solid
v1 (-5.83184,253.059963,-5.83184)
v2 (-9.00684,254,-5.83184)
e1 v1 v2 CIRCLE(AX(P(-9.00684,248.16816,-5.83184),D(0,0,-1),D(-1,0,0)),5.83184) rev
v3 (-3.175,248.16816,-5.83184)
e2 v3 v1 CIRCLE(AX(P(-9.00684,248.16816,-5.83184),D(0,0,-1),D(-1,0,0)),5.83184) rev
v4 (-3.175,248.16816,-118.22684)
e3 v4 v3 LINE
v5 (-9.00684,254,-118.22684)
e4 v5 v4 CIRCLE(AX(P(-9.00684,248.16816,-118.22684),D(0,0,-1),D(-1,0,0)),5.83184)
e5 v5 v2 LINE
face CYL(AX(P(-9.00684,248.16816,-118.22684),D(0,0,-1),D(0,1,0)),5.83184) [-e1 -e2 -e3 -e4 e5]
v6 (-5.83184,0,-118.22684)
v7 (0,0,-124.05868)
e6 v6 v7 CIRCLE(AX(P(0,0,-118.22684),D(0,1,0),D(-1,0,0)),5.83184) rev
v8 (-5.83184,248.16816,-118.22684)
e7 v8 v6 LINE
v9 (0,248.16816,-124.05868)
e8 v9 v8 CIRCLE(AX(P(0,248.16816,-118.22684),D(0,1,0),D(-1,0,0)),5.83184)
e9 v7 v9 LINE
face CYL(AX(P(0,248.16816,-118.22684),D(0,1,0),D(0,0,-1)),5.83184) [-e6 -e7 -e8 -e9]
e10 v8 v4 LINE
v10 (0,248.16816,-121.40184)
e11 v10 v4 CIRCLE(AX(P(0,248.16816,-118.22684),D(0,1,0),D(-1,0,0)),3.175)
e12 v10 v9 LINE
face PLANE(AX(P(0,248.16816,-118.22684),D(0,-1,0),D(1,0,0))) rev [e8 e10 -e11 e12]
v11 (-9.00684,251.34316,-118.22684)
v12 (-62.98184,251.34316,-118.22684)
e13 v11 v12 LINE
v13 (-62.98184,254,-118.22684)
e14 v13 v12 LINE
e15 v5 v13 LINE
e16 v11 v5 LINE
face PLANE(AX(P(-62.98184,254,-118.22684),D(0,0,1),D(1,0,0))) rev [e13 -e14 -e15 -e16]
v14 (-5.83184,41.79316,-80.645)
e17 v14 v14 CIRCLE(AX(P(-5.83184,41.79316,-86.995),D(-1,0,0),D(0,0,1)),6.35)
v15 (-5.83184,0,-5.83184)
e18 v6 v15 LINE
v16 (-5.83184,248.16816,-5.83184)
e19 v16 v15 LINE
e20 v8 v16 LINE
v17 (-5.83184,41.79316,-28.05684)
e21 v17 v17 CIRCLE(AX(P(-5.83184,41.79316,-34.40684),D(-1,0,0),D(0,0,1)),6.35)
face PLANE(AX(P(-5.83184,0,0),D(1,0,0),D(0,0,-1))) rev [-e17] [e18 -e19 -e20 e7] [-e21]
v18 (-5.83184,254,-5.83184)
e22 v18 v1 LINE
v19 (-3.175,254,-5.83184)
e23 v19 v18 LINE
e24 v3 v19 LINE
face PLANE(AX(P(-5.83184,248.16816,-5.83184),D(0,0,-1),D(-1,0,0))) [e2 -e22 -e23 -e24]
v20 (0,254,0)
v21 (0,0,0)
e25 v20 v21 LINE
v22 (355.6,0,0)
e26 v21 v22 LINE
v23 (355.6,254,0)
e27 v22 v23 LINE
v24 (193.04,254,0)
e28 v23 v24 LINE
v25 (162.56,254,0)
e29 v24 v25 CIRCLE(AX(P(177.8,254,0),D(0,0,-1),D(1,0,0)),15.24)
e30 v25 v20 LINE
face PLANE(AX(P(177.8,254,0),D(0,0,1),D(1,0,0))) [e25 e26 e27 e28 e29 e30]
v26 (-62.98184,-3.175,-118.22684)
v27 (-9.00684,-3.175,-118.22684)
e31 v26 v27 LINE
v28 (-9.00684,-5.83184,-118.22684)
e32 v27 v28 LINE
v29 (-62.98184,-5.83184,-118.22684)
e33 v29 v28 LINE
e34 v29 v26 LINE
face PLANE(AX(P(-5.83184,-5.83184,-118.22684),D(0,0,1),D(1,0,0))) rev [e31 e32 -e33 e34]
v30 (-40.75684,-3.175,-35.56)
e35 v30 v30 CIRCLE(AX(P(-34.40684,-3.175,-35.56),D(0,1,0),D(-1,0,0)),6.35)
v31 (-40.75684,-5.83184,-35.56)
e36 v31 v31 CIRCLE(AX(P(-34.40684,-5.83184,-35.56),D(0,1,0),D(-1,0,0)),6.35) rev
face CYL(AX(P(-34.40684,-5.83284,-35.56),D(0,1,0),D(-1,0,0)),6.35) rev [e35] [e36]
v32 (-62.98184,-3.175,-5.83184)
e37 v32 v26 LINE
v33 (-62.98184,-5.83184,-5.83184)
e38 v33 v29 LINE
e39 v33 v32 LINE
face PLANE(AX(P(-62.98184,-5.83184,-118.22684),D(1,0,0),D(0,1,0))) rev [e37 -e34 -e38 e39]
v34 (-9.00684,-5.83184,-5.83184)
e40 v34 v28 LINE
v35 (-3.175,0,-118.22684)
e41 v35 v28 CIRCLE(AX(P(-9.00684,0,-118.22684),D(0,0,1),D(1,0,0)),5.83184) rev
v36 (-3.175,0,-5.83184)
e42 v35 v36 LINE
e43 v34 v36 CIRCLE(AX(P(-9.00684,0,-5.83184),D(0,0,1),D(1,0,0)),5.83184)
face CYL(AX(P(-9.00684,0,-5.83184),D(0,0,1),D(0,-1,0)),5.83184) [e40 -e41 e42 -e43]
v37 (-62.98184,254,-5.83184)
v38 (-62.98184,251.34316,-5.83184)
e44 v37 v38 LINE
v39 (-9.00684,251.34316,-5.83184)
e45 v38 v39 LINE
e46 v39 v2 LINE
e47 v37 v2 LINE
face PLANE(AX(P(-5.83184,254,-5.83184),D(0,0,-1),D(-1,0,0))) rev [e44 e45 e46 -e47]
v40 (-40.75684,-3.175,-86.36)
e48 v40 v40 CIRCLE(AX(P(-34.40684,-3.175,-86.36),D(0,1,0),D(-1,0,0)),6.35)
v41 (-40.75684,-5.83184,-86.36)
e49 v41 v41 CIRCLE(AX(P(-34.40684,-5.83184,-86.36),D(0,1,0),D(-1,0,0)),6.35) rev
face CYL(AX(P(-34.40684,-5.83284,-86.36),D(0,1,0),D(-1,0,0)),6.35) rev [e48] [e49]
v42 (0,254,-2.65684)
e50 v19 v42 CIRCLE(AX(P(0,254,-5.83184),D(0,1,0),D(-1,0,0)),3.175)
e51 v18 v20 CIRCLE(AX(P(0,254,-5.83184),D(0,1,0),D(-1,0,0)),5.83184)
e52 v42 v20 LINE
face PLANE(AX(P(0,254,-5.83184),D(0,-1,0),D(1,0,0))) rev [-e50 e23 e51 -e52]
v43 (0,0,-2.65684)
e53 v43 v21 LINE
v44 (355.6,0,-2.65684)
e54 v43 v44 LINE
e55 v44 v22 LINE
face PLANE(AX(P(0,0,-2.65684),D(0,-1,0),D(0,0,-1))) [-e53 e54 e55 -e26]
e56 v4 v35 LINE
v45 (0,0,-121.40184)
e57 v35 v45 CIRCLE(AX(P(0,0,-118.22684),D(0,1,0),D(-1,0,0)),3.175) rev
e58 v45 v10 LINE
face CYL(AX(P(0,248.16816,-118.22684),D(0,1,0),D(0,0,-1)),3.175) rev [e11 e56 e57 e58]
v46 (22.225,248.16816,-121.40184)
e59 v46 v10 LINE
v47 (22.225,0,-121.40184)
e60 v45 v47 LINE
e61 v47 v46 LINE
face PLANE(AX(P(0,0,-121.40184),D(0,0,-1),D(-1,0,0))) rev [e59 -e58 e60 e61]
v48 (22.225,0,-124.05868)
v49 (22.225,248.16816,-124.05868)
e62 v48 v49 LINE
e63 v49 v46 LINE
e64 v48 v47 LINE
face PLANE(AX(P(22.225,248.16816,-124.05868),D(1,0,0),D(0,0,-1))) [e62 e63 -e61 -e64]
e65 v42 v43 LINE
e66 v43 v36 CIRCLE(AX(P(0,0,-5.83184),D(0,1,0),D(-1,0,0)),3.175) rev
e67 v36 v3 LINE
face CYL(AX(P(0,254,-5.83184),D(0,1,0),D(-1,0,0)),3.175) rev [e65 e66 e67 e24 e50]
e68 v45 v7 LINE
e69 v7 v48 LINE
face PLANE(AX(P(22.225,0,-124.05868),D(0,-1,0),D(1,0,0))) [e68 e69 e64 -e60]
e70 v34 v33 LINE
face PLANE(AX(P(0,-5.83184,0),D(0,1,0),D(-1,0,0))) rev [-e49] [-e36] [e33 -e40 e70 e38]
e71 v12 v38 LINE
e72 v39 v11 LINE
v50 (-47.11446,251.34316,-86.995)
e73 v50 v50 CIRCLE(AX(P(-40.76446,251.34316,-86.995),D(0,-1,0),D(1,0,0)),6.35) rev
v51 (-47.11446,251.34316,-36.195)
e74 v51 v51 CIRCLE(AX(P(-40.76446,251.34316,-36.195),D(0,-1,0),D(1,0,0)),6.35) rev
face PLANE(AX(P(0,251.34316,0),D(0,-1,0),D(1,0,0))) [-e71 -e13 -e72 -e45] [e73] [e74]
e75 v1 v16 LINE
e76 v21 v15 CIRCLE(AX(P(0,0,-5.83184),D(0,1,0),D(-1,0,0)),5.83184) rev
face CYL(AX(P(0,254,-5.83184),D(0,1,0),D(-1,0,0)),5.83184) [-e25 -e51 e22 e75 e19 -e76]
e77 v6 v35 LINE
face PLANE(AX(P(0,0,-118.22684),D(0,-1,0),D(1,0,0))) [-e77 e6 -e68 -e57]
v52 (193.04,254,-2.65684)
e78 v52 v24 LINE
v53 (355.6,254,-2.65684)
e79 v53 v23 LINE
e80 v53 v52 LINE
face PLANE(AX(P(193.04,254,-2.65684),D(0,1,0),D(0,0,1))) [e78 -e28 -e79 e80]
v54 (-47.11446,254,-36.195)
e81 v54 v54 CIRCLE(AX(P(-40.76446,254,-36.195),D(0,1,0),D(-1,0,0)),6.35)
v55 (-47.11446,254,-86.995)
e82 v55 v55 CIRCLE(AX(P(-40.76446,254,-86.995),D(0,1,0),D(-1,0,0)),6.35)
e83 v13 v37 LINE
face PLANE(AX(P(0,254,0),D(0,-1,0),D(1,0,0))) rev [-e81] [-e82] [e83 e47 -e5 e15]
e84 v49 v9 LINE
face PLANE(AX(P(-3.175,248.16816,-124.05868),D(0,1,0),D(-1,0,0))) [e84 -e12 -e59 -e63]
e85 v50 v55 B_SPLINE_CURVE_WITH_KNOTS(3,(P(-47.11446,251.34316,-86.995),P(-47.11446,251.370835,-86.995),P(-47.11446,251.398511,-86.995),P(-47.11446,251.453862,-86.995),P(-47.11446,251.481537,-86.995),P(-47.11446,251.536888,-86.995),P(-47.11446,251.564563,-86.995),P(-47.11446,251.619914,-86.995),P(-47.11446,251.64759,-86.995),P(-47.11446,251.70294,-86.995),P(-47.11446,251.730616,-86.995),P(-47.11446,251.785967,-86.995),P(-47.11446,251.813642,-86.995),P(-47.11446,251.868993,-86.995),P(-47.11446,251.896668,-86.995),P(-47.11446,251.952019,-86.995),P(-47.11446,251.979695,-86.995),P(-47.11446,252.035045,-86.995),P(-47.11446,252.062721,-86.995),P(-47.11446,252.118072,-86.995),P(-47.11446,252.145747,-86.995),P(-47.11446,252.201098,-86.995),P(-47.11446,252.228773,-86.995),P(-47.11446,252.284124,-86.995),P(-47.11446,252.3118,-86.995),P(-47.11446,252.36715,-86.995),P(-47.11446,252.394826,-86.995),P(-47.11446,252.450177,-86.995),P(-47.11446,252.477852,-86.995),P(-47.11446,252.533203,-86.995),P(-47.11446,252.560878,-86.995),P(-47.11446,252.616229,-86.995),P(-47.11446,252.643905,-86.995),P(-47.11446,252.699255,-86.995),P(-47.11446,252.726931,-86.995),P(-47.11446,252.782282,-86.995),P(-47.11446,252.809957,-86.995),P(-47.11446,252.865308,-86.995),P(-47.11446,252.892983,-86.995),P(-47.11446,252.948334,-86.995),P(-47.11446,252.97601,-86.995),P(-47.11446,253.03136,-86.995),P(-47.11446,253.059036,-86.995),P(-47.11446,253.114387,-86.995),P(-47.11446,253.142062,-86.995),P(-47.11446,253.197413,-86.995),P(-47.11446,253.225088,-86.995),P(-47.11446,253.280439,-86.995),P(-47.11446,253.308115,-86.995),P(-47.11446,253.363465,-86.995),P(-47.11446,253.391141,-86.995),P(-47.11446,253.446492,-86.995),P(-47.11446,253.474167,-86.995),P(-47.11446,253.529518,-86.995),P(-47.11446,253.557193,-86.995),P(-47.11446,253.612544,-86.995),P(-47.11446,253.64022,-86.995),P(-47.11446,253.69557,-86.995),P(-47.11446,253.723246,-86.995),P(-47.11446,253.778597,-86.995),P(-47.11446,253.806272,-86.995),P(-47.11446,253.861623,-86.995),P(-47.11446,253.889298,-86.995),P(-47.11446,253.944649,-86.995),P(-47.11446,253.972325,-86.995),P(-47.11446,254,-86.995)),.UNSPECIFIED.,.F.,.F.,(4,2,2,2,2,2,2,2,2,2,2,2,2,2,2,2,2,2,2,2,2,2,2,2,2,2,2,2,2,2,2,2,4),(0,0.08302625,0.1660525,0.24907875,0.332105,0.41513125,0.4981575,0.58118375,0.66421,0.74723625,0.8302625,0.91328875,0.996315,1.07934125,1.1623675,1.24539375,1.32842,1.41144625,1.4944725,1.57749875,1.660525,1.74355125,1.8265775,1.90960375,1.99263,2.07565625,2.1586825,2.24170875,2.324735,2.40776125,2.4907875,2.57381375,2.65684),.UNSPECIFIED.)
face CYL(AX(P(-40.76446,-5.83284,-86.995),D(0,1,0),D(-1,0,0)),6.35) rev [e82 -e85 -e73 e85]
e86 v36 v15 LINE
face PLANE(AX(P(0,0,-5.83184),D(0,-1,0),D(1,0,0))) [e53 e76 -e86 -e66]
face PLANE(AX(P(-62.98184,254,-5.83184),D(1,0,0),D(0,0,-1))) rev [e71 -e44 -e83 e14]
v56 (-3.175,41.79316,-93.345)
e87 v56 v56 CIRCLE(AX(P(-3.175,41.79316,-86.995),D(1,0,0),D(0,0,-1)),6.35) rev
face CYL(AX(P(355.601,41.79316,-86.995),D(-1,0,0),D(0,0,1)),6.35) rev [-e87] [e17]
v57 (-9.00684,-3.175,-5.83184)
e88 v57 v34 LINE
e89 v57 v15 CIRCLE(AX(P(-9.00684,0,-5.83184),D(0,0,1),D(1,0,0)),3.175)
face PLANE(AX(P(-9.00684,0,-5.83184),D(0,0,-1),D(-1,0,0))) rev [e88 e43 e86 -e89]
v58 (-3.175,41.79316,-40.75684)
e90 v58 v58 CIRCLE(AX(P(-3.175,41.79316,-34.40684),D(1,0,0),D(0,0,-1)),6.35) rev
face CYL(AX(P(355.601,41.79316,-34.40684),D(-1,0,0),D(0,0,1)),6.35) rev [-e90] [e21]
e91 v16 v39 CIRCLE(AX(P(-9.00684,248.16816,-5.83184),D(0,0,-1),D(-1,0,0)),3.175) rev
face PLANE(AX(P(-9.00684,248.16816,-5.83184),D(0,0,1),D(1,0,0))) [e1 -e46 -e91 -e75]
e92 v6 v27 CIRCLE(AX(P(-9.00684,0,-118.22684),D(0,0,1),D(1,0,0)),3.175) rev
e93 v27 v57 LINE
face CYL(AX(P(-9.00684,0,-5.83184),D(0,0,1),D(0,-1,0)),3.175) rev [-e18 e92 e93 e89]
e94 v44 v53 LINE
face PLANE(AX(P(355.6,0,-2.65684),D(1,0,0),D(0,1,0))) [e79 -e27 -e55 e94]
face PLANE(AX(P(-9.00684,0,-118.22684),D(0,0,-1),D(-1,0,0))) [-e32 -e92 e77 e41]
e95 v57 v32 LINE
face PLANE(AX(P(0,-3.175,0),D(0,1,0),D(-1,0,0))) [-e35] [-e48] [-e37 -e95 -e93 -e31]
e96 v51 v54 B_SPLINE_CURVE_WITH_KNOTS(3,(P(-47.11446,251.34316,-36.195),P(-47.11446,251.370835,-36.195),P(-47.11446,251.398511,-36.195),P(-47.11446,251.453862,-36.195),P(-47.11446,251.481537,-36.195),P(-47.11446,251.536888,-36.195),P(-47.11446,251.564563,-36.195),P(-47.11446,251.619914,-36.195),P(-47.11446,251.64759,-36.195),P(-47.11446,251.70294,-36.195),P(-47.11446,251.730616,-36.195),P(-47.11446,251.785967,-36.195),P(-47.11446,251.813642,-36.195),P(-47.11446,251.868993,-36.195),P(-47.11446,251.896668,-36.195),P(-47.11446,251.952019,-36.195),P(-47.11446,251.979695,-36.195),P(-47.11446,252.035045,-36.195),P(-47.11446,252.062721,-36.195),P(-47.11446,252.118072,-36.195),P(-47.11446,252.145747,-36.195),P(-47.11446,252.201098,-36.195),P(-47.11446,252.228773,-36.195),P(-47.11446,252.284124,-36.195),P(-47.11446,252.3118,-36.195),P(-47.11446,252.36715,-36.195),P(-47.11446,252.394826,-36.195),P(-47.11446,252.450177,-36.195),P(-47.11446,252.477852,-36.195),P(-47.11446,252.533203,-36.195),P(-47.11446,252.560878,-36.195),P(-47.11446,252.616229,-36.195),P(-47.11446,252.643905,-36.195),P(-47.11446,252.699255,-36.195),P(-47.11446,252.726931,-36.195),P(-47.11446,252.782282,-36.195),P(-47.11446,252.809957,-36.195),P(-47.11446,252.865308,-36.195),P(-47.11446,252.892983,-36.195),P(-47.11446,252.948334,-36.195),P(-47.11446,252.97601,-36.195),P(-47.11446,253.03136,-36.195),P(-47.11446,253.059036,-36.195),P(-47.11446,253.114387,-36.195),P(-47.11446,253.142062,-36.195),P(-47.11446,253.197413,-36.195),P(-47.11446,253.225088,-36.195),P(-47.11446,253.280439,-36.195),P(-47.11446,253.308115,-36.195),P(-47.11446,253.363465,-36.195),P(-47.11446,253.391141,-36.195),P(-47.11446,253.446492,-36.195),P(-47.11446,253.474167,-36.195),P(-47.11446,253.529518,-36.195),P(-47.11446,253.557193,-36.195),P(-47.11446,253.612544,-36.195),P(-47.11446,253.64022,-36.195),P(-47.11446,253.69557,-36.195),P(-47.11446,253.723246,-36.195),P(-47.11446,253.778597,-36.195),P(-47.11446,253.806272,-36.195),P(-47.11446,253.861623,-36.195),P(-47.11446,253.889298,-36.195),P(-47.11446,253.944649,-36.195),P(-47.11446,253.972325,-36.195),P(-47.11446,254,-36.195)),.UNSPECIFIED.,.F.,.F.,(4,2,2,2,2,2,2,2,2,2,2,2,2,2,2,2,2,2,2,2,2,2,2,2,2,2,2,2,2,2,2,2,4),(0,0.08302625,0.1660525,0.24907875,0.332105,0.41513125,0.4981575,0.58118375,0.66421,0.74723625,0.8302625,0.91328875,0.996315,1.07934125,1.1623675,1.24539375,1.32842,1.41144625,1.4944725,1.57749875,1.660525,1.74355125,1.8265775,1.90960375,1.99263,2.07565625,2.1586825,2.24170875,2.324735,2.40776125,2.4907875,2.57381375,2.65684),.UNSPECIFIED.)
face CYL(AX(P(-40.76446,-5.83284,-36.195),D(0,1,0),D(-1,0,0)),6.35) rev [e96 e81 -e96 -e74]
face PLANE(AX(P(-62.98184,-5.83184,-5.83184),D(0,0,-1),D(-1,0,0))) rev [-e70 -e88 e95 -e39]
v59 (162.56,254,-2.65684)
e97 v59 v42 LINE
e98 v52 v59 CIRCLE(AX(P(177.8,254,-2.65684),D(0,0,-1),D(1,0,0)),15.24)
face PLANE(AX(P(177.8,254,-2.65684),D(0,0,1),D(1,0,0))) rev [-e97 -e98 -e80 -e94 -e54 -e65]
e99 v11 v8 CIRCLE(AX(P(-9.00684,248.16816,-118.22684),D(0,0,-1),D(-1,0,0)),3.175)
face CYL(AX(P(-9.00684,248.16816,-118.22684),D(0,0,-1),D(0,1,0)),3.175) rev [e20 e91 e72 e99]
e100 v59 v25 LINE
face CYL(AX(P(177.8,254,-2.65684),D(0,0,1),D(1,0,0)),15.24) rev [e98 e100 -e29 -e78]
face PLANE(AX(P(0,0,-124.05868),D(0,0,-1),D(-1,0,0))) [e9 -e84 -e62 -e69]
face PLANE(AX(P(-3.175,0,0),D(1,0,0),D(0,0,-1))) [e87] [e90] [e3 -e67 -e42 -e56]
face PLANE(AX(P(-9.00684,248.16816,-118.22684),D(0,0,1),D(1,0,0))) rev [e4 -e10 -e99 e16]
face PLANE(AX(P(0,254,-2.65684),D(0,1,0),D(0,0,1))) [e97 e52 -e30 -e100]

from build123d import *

# Parameters (mm, degrees)
BASE_FLANGE1_DEPTH           = 2.65684
EDGE_FLANGE1_DEPTH           = 254
EDGE_FLANGE2_STRIP_W         = 16.97736
EDGE_FLANGE2_STRIP_H         = 2.65684
EDGE_FLANGE2_STRIP_CUT_DEPTH = 112.395
EDGE_FLANGE2_DEPTH           = 112.395
EDGE_FLANGE3_DEPTH           = 112.395
EDGE_FLANGE4_DEPTH           = 248.16816
SKETCH22_R                   = 6.35
CUT_EXTRUDE1_DEPTH           = 2.65684
SKETCH23_R                   = 6.35
CUT_EXTRUDE2_DEPTH           = 2.65684
SKETCH24_R                   = 6.35
CUT_EXTRUDE3_DEPTH           = 2.65684


# Sheet-metal steps are written as plain solids
with BuildPart() as part:
    # Sketch1 → Base-Flange1 (new body)
    with BuildSketch(Plane.XY):
        with BuildLine():
            Line((0, 0), (355.6, 0))
            Line((355.6, 0), (355.6, 254))
            Line((355.6, 254), (193.04, 254))
            ThreePointArc((193.04, 254), (177.8, 238.76), (162.56, 254))
            Line((162.56, 254), (0, 254))
            Line((0, 254), (0, 0))
        make_face()
    extrude(amount=-BASE_FLANGE1_DEPTH)

    # Edge-Flange1 section (across the edge) → Edge-Flange1 (add)
    with BuildSketch(Plane(origin=(-3.175, 0, -2.65684), x_dir=(1, 0, 0), z_dir=(0, 1, 0))):
        with BuildLine():
            Line((-2.65684, 3.175), (-2.65684, 115.57))
            Line((-2.65684, 115.57), (0, 115.57))
            Line((0, 115.57), (0, 3.175))
            ThreePointArc((0, 3.175), (0.92993597, 0.92993597), (3.175, 0))
            Line((3.175, 0), (3.175, -2.65684))
            ThreePointArc((3.175, -2.65684), (-0.948733611, -0.948733611), (-2.65684, 3.175))
        make_face()
    extrude(amount=EDGE_FLANGE1_DEPTH)

    # Edge-Flange2 strip (across the edge) → Edge-Flange2 strip cut (cut)
    with BuildSketch(Plane(origin=(-5.83184, 254, -5.83184), x_dir=(0, -1, 0), z_dir=(0, 0, -1))):
        with Locations((-2.65684, -1.32842)):
            Rectangle(EDGE_FLANGE2_STRIP_W, EDGE_FLANGE2_STRIP_H)
    extrude(amount=EDGE_FLANGE2_STRIP_CUT_DEPTH, mode=Mode.SUBTRACT)

    # Edge-Flange2 section (across the edge) → Edge-Flange2 (add)
    with BuildSketch(Plane(origin=(-5.83184, 254, -5.83184), x_dir=(0, -1, 0), z_dir=(0, 0, -1))):
        with BuildLine():
            Line((0, 3.175), (0, 57.15))
            Line((0, 57.15), (2.65684, 57.15))
            Line((2.65684, 57.15), (2.65684, 3.175))
            ThreePointArc((2.65684, 3.175), (3.58677597, 0.92993597), (5.83184, 0))
            Line((5.83184, 0), (5.83184, -2.65684))
            ThreePointArc((5.83184, -2.65684), (1.708106389, -0.948733611), (0, 3.175))
        make_face()
    extrude(amount=EDGE_FLANGE2_DEPTH)

    # Edge-Flange3 section (across the edge) → Edge-Flange3 (add)
    with BuildSketch(Plane(origin=(-5.83184, -3.175, -118.22684), x_dir=(0, 1, 0), z_dir=(0, 0, 1))):
        with BuildLine():
            Line((-2.65684, 3.175), (-2.65684, 57.15))
            Line((-2.65684, 57.15), (0, 57.15))
            Line((0, 57.15), (0, 3.175))
            ThreePointArc((0, 3.175), (0.92993597, 0.92993597), (3.175, 0))
            Line((3.175, 0), (3.175, -2.65684))
            ThreePointArc((3.175, -2.65684), (-0.948733611, -0.948733611), (-2.65684, 3.175))
        make_face()
    extrude(amount=EDGE_FLANGE3_DEPTH)

    # Edge-Flange4 section (across the edge) → Edge-Flange4 (add)
    with BuildSketch(Plane(origin=(-3.175, 0, -121.40184), x_dir=(0, 0, 1), z_dir=(0, 1, 0))):
        with BuildLine():
            Line((-2.65684, 3.175), (-2.65684, 25.4))
            Line((-2.65684, 25.4), (0, 25.4))
            Line((0, 25.4), (0, 3.175))
            ThreePointArc((0, 3.175), (0.92993597, 0.92993597), (3.175, 0))
            Line((3.175, 0), (3.175, -2.65684))
            ThreePointArc((3.175, -2.65684), (-0.948733611, -0.948733611), (-2.65684, 3.175))
        make_face()
    extrude(amount=EDGE_FLANGE4_DEPTH)

    # Sketch22 → Cut-Extrude1 (cut)
    with BuildSketch(Plane(origin=(0, 254, 0), x_dir=(1, 0, 0), z_dir=(0, 1, 0))):
        with Locations(Location((-40.76446, 86.995, 0), (0, 0, 180))):
            Circle(SKETCH22_R)
        with Locations(Location((-40.76446, 36.195, 0), (0, 0, 180))):
            Circle(SKETCH22_R)
    extrude(amount=-CUT_EXTRUDE1_DEPTH, mode=Mode.SUBTRACT)

    # Sketch23 → Cut-Extrude2 (cut)
    with BuildSketch(Plane(origin=(0, -3.175, 0), x_dir=(1, 0, 0), z_dir=(0, 1, 0))):
        with Locations(Location((-34.40684, 86.36, 0), (0, 0, 180))):
            Circle(SKETCH23_R)
        with Locations(Location((-34.40684, 35.56, 0), (0, 0, 180))):
            Circle(SKETCH23_R)
    extrude(amount=-CUT_EXTRUDE2_DEPTH, mode=Mode.SUBTRACT)

    # Sketch24 → Cut-Extrude3 (cut)
    with BuildSketch(Plane.ZY.offset(5.83184)):
        with Locations((-86.995, 41.79316)):
            Circle(SKETCH24_R)
        with Locations((-34.40684, 41.79316)):
            Circle(SKETCH24_R)
    extrude(amount=-CUT_EXTRUDE3_DEPTH, mode=Mode.SUBTRACT)


solid = part.part
